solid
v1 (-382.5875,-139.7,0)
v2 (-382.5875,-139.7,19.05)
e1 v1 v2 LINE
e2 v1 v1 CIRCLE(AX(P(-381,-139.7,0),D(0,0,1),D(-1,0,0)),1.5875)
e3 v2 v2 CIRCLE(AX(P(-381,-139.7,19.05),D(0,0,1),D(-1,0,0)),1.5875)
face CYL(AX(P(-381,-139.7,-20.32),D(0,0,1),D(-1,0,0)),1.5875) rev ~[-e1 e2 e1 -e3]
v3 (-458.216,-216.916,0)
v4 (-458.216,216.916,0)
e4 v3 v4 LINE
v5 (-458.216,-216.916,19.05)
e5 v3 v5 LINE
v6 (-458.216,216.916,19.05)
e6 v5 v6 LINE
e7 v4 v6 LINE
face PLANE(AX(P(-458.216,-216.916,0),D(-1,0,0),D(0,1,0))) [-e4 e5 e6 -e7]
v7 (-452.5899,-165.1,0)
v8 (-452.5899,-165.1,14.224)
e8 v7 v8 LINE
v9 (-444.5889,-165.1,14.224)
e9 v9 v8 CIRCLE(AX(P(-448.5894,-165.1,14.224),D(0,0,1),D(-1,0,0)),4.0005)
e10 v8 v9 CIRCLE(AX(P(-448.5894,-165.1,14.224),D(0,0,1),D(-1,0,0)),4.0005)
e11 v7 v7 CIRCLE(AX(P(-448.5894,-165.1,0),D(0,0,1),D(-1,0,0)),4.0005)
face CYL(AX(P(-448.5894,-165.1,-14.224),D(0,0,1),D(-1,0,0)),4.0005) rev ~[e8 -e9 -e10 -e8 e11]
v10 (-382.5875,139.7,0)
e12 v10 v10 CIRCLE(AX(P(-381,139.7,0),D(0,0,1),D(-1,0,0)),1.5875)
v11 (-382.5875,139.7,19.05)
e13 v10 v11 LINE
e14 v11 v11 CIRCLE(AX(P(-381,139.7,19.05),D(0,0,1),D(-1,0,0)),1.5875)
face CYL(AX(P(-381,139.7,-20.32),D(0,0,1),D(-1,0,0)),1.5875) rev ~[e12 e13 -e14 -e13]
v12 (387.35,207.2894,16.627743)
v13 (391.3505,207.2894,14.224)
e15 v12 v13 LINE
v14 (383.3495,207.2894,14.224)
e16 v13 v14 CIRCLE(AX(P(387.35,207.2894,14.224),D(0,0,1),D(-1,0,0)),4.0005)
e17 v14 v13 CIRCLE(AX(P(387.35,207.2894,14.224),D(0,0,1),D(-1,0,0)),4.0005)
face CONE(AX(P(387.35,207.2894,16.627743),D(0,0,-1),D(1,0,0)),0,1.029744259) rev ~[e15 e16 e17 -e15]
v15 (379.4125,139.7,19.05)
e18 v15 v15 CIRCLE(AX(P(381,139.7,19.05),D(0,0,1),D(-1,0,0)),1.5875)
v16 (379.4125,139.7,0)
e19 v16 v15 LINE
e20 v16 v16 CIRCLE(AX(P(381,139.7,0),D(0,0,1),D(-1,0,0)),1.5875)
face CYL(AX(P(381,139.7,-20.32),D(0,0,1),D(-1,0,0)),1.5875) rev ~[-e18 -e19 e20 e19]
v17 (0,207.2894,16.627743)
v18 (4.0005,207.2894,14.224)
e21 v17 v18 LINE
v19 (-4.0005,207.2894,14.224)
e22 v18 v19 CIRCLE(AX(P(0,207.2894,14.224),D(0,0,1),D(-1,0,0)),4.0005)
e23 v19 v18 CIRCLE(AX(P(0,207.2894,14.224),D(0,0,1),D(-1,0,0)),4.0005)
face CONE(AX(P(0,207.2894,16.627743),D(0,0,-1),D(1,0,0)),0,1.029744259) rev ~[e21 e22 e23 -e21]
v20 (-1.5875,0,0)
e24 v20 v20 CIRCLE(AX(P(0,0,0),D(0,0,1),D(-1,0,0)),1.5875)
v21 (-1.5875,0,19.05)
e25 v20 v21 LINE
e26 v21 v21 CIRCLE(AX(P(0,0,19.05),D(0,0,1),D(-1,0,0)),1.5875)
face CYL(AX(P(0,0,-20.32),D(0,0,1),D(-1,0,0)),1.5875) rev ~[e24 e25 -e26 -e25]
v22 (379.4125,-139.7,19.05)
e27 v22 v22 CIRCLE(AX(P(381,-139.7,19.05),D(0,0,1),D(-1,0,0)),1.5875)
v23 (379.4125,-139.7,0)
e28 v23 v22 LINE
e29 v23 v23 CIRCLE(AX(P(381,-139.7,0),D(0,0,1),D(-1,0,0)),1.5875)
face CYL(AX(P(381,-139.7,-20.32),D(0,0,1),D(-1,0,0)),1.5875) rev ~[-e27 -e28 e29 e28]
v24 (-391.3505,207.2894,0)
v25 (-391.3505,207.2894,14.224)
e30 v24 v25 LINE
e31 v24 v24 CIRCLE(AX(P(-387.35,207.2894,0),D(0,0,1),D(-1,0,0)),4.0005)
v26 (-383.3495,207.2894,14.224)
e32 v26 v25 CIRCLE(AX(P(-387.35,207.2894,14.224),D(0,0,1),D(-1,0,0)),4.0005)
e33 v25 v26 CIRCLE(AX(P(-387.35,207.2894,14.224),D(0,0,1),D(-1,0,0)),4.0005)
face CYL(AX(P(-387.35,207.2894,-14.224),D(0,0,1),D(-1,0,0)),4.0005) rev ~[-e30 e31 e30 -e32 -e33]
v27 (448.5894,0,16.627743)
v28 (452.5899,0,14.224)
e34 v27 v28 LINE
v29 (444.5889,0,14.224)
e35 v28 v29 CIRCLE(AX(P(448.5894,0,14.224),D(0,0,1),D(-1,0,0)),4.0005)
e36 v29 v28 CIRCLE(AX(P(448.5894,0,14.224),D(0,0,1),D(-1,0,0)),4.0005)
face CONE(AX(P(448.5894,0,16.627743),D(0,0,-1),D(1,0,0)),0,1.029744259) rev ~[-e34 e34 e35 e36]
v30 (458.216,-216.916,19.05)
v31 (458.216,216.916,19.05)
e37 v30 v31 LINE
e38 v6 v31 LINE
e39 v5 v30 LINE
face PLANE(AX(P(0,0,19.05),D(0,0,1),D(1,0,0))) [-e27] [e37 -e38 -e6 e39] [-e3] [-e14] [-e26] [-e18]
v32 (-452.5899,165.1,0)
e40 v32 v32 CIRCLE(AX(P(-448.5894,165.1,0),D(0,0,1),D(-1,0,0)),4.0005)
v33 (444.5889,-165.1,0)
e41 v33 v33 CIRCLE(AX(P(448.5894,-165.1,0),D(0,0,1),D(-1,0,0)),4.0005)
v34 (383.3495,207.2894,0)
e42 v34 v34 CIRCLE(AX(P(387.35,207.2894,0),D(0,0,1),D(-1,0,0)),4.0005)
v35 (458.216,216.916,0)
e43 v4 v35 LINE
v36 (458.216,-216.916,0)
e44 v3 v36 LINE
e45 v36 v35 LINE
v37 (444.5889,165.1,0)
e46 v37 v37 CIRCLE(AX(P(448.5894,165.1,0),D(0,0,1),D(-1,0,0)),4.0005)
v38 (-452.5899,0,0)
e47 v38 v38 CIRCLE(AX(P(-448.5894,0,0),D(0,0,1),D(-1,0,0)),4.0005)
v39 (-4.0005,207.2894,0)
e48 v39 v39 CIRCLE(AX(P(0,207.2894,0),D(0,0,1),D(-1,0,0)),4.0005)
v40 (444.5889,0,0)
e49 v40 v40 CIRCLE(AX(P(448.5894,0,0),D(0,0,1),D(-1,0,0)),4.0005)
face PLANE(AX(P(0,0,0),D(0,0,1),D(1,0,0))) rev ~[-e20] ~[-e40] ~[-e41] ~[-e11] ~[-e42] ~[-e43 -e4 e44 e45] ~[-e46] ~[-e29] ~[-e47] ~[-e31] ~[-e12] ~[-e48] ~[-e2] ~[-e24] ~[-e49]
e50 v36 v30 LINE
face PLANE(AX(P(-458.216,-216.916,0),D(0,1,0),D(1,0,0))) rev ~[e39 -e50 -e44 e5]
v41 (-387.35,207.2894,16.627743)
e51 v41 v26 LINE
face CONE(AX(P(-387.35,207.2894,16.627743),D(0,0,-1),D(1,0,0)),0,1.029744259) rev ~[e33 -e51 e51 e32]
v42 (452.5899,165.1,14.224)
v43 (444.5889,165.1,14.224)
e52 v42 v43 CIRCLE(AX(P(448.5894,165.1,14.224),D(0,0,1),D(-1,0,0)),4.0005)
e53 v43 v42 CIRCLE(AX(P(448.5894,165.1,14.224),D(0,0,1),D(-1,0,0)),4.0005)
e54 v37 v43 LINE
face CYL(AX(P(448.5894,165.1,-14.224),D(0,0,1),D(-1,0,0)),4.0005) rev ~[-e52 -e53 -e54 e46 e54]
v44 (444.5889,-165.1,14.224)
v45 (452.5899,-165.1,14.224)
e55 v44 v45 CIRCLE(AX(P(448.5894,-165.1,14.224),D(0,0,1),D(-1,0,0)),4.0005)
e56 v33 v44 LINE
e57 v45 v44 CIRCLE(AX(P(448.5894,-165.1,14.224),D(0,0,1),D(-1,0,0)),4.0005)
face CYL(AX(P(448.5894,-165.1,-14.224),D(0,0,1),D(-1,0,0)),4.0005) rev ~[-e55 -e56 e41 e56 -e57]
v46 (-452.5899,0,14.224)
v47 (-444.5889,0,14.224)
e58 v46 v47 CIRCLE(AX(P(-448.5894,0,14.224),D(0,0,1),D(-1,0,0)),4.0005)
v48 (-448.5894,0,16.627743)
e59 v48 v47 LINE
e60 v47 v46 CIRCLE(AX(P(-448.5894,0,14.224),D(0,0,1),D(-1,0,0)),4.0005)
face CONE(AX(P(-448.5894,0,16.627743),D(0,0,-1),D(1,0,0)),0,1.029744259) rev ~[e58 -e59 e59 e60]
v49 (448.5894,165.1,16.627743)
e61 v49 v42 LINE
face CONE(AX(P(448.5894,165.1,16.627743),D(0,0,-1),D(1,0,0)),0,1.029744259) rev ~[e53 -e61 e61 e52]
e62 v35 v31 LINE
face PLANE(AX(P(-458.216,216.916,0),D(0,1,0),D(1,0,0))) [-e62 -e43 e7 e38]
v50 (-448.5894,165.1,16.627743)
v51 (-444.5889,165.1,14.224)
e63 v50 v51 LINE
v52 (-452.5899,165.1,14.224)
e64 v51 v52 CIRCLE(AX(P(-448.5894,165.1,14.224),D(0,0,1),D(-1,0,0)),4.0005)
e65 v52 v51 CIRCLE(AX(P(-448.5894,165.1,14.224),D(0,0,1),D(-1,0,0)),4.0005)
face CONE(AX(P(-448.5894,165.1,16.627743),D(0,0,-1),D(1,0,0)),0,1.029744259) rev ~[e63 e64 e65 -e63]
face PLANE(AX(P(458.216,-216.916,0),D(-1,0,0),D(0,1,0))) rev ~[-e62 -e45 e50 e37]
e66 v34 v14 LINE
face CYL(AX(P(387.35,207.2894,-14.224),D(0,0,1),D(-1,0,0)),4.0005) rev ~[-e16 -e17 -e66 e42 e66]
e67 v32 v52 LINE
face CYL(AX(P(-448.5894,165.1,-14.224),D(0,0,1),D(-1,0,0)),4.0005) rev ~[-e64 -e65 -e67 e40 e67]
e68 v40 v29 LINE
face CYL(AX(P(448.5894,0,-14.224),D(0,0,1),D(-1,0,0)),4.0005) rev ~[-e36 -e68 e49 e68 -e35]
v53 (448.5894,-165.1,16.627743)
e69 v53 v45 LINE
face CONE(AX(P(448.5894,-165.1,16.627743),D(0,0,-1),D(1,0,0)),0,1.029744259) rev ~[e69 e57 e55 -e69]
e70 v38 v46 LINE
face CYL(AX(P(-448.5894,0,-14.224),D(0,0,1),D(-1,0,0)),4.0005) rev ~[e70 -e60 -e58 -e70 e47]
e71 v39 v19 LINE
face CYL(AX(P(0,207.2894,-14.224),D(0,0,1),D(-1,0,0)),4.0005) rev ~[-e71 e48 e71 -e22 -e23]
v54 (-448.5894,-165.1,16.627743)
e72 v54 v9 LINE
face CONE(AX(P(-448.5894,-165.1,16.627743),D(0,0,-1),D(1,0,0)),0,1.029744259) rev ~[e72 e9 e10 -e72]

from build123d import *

# Parameters (mm, degrees)
F0_W     = 916.432
F0_H     = 433.832
F1_DEPTH = 19.05
F3_D     = 8.001
F3_DEPTH = 14.224
F3_TIP   = 2.4037429064
F5_D     = 3.175
F5_DEPTH = 20.32
F5_TIP   = 0.9538662327


with BuildPart() as f1:
    # F0 (on Top) → F1 (new body)
    with BuildSketch(Plane.XY):
        Rectangle(F0_W, F0_H)
    extrude(amount=F1_DEPTH)

    # F3
    with Locations(Plane(origin=(0, 0, 0), x_dir=(1, 0, 0), z_dir=(0, 0, -1))):
        with Locations((-448.5894, 165.1), (-448.5894, 0), (-448.5894, -165.1), (-387.35, -207.2894), (0, -207.2894), (387.35, -207.2894), (448.5894, -165.1), (448.5894, 0), (448.5894, 165.1)):
            Hole(F3_D / 2, depth=F3_DEPTH)
            with Locations((0, 0, -(F3_DEPTH + F3_TIP / 2))):  # 118° drill point
                Cone(0, F3_D / 2, F3_TIP, mode=Mode.SUBTRACT)

    # F5
    with Locations(Plane(origin=(0, 0, 0), x_dir=(1, 0, 0), z_dir=(0, 0, -1))):
        with Locations((-381, 139.7), (0, 0), (-381, -139.7), (381, -139.7), (381, 139.7)):
            Hole(F5_D / 2, depth=F5_DEPTH)
            with Locations((0, 0, -(F5_DEPTH + F5_TIP / 2))):  # 118° drill point
                Cone(0, F5_D / 2, F5_TIP, mode=Mode.SUBTRACT)


solid = f1.part
